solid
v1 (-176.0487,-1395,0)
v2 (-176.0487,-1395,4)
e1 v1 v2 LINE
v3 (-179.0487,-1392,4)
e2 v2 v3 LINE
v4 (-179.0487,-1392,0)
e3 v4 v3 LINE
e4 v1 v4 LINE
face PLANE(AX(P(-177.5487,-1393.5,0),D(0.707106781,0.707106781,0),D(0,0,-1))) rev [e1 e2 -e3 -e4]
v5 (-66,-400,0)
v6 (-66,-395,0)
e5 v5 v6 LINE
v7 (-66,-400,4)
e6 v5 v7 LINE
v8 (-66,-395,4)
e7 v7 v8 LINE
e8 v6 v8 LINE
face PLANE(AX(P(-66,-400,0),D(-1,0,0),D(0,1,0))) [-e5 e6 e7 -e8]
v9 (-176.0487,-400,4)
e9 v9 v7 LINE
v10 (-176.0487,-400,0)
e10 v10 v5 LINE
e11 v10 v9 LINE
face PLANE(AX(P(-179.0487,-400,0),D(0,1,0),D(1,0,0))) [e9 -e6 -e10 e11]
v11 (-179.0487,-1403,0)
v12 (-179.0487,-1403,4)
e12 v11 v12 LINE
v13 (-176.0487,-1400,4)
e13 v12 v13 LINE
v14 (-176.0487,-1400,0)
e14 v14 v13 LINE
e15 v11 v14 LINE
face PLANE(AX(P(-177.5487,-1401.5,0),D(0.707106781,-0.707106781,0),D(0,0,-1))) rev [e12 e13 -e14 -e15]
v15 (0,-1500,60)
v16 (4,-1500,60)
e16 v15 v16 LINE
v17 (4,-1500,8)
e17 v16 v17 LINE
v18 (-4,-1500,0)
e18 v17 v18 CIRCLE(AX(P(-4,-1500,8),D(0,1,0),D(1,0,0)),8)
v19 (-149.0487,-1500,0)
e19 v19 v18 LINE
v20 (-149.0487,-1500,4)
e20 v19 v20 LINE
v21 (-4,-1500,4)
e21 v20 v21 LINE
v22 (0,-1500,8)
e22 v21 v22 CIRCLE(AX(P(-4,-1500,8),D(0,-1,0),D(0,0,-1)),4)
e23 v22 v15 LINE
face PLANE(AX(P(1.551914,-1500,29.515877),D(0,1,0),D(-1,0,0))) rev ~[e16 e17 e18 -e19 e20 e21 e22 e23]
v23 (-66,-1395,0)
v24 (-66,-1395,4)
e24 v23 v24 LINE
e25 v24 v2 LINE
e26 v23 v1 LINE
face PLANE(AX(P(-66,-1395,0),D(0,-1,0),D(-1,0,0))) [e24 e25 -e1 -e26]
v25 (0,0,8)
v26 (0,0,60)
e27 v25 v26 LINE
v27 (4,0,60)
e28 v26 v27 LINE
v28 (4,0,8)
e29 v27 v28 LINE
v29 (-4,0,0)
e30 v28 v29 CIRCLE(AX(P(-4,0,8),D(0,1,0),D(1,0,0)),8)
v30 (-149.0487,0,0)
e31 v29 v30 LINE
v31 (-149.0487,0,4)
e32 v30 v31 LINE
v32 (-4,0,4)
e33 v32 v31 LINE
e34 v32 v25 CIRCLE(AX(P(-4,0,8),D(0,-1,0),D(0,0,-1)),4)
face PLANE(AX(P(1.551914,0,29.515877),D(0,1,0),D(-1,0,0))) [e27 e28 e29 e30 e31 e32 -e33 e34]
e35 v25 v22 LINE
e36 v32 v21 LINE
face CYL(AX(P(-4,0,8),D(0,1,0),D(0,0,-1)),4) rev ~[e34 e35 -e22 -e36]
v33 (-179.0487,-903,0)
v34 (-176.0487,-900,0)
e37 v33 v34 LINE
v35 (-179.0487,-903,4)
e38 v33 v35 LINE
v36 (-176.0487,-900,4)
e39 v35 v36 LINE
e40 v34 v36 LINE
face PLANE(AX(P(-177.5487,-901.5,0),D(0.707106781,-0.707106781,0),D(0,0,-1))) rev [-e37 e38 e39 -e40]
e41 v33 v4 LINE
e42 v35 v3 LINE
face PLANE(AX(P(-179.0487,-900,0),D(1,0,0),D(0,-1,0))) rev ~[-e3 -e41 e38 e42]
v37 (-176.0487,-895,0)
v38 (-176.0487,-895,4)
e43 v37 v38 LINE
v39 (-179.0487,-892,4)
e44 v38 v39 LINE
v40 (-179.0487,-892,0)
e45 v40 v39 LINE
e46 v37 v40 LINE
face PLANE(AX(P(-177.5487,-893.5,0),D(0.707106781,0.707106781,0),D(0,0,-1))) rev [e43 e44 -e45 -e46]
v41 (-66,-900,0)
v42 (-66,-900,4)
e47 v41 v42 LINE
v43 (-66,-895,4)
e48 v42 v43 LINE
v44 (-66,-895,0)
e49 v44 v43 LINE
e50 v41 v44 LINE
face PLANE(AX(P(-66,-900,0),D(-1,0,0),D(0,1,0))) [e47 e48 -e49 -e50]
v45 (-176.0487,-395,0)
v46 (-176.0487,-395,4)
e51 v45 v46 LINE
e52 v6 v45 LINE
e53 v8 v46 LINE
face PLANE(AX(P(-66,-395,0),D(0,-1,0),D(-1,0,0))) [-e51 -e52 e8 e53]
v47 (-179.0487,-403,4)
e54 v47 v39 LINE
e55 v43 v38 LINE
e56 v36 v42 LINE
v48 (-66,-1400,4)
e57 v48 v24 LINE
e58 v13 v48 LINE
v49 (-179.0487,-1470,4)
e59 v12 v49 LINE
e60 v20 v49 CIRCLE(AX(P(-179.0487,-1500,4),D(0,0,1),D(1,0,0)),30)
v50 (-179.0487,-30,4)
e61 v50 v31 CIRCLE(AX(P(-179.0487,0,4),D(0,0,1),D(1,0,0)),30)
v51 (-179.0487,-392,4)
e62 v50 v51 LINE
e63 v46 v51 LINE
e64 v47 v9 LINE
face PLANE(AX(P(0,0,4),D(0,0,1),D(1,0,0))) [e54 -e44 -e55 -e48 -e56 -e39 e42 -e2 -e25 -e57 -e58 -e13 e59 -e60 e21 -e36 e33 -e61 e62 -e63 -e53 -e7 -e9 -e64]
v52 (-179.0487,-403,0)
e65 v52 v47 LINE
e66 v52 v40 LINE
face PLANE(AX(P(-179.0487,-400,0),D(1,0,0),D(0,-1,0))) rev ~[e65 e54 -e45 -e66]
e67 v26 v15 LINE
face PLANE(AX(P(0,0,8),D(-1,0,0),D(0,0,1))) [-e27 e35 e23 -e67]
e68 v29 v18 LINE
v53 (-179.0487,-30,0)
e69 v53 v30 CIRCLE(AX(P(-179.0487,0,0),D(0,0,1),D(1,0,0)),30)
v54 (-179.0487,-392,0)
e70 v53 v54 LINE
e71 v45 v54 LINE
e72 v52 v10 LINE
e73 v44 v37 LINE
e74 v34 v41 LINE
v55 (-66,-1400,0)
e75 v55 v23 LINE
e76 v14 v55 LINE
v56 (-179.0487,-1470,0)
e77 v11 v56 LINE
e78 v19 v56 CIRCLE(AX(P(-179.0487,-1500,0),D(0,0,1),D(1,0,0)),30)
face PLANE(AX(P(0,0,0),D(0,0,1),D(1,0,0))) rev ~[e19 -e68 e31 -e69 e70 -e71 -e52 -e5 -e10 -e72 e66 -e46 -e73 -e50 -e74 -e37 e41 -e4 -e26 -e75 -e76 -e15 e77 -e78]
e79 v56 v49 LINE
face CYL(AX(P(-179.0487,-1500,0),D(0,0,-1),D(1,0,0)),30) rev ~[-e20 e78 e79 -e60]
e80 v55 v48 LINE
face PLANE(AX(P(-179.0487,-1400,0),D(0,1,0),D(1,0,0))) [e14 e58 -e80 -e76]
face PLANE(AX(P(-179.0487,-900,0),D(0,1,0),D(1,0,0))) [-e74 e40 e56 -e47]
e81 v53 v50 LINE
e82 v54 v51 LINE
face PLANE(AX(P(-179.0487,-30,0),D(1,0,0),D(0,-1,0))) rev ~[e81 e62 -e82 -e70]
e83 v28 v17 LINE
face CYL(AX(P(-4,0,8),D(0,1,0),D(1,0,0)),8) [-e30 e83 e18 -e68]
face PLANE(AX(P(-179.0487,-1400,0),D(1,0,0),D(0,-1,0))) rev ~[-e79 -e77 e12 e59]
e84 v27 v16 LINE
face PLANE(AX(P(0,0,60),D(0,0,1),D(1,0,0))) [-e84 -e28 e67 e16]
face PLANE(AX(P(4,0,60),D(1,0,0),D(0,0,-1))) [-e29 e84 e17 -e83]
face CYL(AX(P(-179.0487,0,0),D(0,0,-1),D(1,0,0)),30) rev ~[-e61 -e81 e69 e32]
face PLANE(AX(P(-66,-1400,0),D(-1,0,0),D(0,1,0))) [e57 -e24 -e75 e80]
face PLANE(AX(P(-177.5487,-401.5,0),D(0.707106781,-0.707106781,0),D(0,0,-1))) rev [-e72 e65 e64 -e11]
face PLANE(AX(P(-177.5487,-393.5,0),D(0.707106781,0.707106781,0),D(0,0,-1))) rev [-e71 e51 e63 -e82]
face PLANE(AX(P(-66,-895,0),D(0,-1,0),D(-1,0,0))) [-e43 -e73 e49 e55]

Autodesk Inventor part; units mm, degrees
ref_plane "YZ Plane" through (0, 0, 0) normal (1, 0, 0) x (0, 1, 0)
ref_plane "XZ Plane" through (0, 0, 0) normal (0, 1, 0) x (-1, 0, 0)
ref_plane "XY Plane" through (0, 0, 0) normal (0, 0, 1) x (1, 0, 0)
sketch "Sketch1" plane through (0, 0, 0) normal (0, 0, 1) x (1, 0, 0)
  line L0 (0, 0) -> (-179.0487, 0)
  line L1 (-179.0487, 0) -> (-179.0487, -1500)
  line L2 (-179.0487, -1500) -> (0, -1500)
  line L3 (0, -1500) -> (0, 0)
  line L4 (-179.0487, -1400) -> (-66, -1400)
  line L5 (-66, -1400) -> (-66, -1395)
  line L6 (-66, -1395) -> (-179.0487, -1395)
  line L7 (-179.0487, -1395) -> (-179.0487, -1400)
  line L8 (-179.0487, -900) -> (-66, -900)
  line L9 (-66, -900) -> (-66, -895)
  line L10 (-66, -895) -> (-179.0487, -895)
  line L11 (-179.0487, -895) -> (-179.0487, -900)
  line L12 (-179.0487, -400) -> (-66, -400)
  line L13 (-66, -400) -> (-66, -395)
  line L14 (-66, -395) -> (-179.0487, -395)
  line L15 (-179.0487, -395) -> (-179.0487, -400)
  circle A0 centre (-179.0487, 0) radius 30
  circle A1 centre (-179.0487, -1500) radius 30
  point P0 (-179.0487, -400)
  point P1 (-149.0487, 0)
  point P2 (-179.0487, -30)
  point P3 (-179.0487, -1470)
  point P4 (-149.0487, -1500)
  dimension "d0" = 1500
  dimension "d1" = 179.0487
  dimension "d2" = 5
  dimension "d4" = 100
  dimension "d7" = 500
  dimension "d23" = 66
  dimension "d24" = 60
extrude "Plate1" add sketch "Sketch1" along normal blind 4 contours L3 L2 A1 L1 L4 L5 L6 L8 L9 L10 L12 L13 L14 A0 L0
sketch "Sketch2" plane through (4, 0, 0) normal (-1, 0, 0) x (0, -1, 0)
  line L0 (1500, 0) -> (0, 0)
  line L1 (0, 0) -> (0, 60)
  line L2 (0, 60) -> (1500, 60)
  line L3 (1500, 60) -> (1500, 0)
edge flange "Flange1" height 60 angle 90 thickness 4 bend radius 4 thickness toward (-1, 0, 0) relief tear relief width 4 relief depth 2 edges at (0, -750, 4) wall of the first edge with corners at (4, -1500, 0) (4, 0, 0) (4, 0, 60) (4, -1500, 60)
bend "Bend1"
corner "Corner1"
chamfer "Corner Chamfer1" distance 3 angle 45 6 edges at (-179.0487, -1400, 2) (-179.0487, -1395, 2) (-179.0487, -900, 2) (-179.0487, -895, 2) (-179.0487, -395, 2) (-179.0487, -400, 2)
equation "\"d1\" = стрингер_глубина_2"
equation "\"d2\" = паз_под_стрингер_толщина"
equation "\"d23\" = паз_под_стрингер_глубина - Thickness"
equation "\"d24\" = 2 * радиус_выреза_под_сварку"
equation "\"d12\" = Thickness"
equation "\"d13\" = BendReliefWidth"
equation "\"d14\" = BendReliefDepth"
equation "\"d15\" = MinimumRemnant"
equation "\"d16\" = TransitionRadius"
equation "\"d17\" = ребро_усилителей"
equation "\"d19\" = BendRadius"
equation "\"d20\" = CornerReliefSize"
equation "\"d21\" = GapSize"
equation "\"d22\" = JacobiRadiusSize"
equation "\"BendRadius\" = Thickness"
equation "\"BendReliefWidth\" = Thickness"
equation "\"BendReliefDepth\" = 0.5 * Thickness"
equation "\"CornerReliefSize\" = 4 * Thickness"
equation "\"MinimumRemnant\" = 2 * Thickness"
equation "\"TransitionRadius\" = BendRadius"
equation "\"JacobiRadiusSize\" = BendRadius"
equation "\"GapSize\" = Thickness"
equation "\"стрингер_глубина_2\" = 179.048739"
equation "\"паз_под_стрингер_толщина\" = 5"
equation "\"паз_под_стрингер_глубина\" = 70"
equation "\"Thickness\" = 4"
equation "\"радиус_выреза_под_сварку\" = 30"
equation "\"ребро_усилителей\" = 60"
properties part number "0232 GBK stringer 2" material "Steel"
